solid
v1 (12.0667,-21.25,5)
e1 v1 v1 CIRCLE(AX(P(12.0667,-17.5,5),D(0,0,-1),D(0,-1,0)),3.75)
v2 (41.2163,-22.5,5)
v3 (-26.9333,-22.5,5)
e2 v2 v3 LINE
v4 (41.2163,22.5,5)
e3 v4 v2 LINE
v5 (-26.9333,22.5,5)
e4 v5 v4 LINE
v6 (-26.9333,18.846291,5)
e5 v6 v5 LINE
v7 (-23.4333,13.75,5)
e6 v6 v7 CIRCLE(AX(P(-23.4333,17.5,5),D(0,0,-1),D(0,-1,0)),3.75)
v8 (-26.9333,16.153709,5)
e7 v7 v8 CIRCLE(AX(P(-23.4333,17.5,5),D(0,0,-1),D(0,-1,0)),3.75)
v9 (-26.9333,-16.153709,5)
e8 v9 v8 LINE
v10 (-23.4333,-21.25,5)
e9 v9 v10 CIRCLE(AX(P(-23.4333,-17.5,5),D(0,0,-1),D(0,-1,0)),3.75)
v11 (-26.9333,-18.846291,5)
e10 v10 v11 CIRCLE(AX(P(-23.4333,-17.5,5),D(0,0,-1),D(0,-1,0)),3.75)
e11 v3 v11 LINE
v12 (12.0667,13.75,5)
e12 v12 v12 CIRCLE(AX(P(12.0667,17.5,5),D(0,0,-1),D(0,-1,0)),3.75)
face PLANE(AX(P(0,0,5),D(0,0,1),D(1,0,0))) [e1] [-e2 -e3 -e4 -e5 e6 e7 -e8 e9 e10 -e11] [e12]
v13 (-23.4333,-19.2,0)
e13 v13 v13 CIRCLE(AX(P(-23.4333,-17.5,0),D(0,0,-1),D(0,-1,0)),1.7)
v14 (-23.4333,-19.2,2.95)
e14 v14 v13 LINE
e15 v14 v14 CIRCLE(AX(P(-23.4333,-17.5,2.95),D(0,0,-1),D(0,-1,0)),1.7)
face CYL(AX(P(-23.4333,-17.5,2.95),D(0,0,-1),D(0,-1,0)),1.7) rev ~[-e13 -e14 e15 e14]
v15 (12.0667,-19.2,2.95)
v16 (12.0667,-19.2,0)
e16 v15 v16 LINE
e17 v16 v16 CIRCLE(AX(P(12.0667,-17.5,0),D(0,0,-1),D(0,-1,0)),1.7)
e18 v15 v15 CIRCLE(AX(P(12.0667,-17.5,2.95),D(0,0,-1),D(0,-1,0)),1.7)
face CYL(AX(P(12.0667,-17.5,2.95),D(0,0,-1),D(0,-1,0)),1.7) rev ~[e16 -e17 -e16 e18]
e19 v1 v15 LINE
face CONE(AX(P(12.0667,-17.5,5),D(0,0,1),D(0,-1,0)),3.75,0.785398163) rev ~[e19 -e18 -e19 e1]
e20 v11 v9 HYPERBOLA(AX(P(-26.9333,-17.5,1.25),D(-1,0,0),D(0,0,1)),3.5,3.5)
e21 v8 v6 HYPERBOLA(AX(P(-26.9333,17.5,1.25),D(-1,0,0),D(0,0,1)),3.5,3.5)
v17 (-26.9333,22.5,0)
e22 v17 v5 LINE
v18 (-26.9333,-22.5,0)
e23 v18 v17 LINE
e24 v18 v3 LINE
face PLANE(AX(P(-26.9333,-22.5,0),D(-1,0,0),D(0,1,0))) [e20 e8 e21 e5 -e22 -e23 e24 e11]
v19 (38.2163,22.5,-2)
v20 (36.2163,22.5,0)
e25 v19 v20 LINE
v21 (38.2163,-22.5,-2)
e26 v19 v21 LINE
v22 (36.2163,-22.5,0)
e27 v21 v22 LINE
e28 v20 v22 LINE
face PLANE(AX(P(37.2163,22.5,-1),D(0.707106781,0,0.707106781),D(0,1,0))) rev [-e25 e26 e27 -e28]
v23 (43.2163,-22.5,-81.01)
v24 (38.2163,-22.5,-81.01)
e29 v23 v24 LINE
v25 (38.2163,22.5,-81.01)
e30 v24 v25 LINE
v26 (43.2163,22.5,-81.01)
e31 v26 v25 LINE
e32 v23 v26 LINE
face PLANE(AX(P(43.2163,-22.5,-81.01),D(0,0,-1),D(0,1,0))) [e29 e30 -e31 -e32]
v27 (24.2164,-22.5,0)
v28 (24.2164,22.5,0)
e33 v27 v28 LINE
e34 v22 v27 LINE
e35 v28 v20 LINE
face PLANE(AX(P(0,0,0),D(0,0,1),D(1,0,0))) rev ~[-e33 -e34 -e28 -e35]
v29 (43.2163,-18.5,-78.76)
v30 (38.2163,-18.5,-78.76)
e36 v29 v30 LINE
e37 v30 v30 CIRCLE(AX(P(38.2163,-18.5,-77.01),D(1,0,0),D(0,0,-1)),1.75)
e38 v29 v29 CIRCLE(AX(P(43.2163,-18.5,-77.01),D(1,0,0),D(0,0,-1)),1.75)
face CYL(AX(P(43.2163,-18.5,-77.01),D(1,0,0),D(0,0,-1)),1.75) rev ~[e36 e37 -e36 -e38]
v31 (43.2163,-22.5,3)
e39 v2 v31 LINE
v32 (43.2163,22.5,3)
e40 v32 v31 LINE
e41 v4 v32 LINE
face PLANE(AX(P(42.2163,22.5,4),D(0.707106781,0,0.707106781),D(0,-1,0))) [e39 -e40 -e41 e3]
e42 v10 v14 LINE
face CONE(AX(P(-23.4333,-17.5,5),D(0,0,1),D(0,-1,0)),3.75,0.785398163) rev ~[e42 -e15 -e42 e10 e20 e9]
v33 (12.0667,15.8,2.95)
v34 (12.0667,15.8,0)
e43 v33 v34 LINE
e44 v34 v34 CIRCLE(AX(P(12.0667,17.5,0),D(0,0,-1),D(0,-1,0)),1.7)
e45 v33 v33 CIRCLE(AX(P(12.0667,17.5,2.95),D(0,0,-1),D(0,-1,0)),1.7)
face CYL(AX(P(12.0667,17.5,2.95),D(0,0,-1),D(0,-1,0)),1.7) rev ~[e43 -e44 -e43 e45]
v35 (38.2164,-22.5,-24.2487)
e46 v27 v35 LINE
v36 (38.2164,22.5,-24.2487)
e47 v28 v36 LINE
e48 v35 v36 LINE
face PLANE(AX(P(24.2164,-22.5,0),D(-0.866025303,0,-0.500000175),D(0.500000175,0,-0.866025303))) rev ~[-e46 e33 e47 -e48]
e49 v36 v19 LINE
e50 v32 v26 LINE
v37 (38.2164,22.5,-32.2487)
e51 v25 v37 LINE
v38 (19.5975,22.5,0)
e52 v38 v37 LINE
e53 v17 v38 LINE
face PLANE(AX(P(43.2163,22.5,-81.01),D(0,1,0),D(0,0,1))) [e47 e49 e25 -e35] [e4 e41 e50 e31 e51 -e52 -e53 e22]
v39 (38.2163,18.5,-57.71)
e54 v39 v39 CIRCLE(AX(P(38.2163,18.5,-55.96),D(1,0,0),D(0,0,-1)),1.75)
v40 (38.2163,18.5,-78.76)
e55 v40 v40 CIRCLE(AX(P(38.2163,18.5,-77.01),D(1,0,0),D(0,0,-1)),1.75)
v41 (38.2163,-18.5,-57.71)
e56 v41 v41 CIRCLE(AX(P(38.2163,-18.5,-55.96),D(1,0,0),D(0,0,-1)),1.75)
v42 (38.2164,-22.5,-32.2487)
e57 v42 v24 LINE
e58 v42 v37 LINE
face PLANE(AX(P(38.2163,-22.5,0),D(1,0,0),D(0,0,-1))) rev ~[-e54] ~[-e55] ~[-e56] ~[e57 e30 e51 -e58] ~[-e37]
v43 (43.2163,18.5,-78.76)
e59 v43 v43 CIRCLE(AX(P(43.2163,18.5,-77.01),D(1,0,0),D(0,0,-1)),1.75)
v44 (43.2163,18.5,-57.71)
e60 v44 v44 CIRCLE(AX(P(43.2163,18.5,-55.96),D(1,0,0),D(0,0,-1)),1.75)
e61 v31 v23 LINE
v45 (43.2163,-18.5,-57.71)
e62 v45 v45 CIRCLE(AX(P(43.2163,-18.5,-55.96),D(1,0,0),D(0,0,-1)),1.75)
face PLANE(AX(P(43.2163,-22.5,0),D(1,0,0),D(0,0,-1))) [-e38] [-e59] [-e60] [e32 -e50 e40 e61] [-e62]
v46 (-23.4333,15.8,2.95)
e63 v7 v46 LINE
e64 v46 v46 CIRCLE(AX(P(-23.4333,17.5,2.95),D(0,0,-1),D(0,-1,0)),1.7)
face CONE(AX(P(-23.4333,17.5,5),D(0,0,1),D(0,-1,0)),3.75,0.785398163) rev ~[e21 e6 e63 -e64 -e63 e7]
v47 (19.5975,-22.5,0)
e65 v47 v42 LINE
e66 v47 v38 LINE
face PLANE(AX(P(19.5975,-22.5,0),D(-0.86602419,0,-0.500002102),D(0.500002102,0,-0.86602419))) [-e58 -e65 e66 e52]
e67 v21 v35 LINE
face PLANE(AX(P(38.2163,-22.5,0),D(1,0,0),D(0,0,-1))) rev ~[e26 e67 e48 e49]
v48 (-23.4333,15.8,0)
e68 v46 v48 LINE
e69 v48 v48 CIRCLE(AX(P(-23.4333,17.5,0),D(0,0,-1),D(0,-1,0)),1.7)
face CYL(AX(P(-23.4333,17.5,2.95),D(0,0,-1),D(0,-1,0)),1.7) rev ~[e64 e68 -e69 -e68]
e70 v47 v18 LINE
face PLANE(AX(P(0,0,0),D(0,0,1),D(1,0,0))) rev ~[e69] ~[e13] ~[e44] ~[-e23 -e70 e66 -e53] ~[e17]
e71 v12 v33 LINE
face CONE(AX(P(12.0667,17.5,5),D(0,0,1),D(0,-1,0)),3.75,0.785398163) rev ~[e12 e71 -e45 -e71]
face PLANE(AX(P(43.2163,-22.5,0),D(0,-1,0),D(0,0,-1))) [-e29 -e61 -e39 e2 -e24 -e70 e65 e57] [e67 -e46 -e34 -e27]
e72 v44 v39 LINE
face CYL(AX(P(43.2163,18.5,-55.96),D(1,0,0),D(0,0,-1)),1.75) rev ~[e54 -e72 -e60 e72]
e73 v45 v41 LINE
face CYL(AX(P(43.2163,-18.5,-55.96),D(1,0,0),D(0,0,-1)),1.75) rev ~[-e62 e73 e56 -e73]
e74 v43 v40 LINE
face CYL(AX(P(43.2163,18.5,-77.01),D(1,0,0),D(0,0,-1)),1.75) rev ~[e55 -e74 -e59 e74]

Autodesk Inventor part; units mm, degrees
ref_plane "YZ Plane" through (0, 0, 0) normal (1, 0, 0) x (0, 1, 0)
ref_plane "XZ Plane" through (0, 0, 0) normal (0, 1, 0) x (-1, 0, 0)
ref_plane "XY Plane" through (0, 0, 0) normal (0, 0, 1) x (1, 0, 0)
sketch "Skizze1" plane through (0, 0, 0) normal (0, 0, 1) x (1, 0, 0)
  circle A0 centre (12.0667, -17.5) radius 2 projected
  circle A1 centre (12.0667, 17.5) radius 2 projected
  line L0 (17.0667, 22.5) -> (17.0667, -22.5) projected
  line L1 (7.0667, 22.5) -> (17.0667, 22.5) projected
  line L2 (7.0667, -22.5) -> (7.0667, 22.5) projected
  line L3 (17.0667, -22.5) -> (7.0667, -22.5) projected
  circle A2 centre (-23.4333, -17.5) radius 2 projected
  circle A3 centre (-23.4333, 17.5) radius 2 projected
  line L4 (-19.9333, 22.5) -> (-19.9333, -22.5) projected
  line L5 (-26.9333, 22.5) -> (-19.9333, 22.5) projected
  line L6 (-26.9333, -22.5) -> (-26.9333, 22.5) projected
  line L7 (-19.9333, -22.5) -> (-26.9333, -22.5) projected
  line L8 (43.2163, 19.557) -> (43.2163, 16.9277) projected
  line L9 (43.2163, -19.557) -> (43.2163, -16.9277) projected
  line L10 (43.2163, -20.3) -> (43.2163, -16.7) projected
  line L11 (43.2163, 20.3) -> (43.2163, 16.7) projected
  line L12 (-26.9333, 22.5) -> (43.2163, 22.5)
  line L13 (43.2163, 22.5) -> (43.2163, -22.5)
  line L14 (43.2163, -22.5) -> (-26.9333, -22.5)
  line L15 (-26.9333, -22.5) -> (-26.9333, 22.5)
  point P0 (0, 0)
extrude "Extrusion1" add sketch "Skizze1" along normal blind 5 contours A0 | A1 | L12 L13 L11 L8 L10 L9 L14 L0 | L0 L3 L2 L1 | L2 L14 L4 L12 | L4 L7 L6 L5 | A2 | A3
sketch "Skizze2" plane through (43.2163, -22.5, 0) normal (1, 0, 0) x (0, 0, -1)
  line L0 (0, 0) -> (-5, 0) projected
  line L1 (0, 0) -> (81.01, 0)
  line L2 (81.01, 0) -> (81.01, 45)
  line L3 (81.01, 45) -> (0, 45)
  line L4 (0, 45) -> (0, 0)
  circle A0 centre (77.01, 41) radius 1.8 construction
  circle A1 centre (77.01, 4) radius 1.8 construction
  arc A2 (54.796, 42.057) -> (57.124, 42.057) centre (55.96, 41) ccw construction
  arc A3 (57.124, 2.943) -> (54.796, 2.943) centre (55.96, 4) ccw construction
  circle A4 centre (55.96, 41) radius 1.75
  circle A5 centre (55.96, 4) radius 1.75
  circle A6 centre (77.01, 41) radius 1.75
  circle A7 centre (77.01, 4) radius 1.75
  point P0 (0, 22.5)
  dimension "d2" = 4
  dimension "d5" = 3.5
  dimension "d6" = 3.5
  dimension "d7" = 3.5
  dimension "d8" = 3.5
extrude "Extrusion2" add sketch "Skizze2" against normal blind 5
sketch "Skizze3" plane through (-26.9333, -22.5, 5) normal (0, -1, 0) x (1, 0, 0)
  line L0 (0, -5) -> (65.1497, -5) projected
  line L1 (31.7157, -5) -> (77.2703, -5) construction
  line L2 (65.1497, -86.01) -> (65.1497, -5) projected
  line L3 (51.1497, -5) -> (65.1497, -29.2487)
  line L4 (51.1497, -5) -> (79.1497, -5) construction
  line L5 (46.5308, -5) -> (65.1497, -37.2487)
  point P0 (26.9333, -5)
  dimension "d11" = 60
  dimension "d12" = 14
  dimension "d13" = 4
extrude "Extrusion3" add sketch "Skizze3" against normal up to surface (45 mm away) contours L0 L3 L2 L5
chamfer "Fasen1" distance 2 angle 45 2 edges at (38.2163, 0, 0) (43.2163, 0, 5)
sketch "Skizze4" plane through (0, 0, 5) normal (0, 0, 1) x (1, 0, 0)
  circle A0 centre (12.0667, 17.5) radius 2 projected
  circle A1 centre (12.0667, -17.5) radius 2 projected
  circle A2 centre (-23.4333, -17.5) radius 2 projected
  circle A3 centre (-23.4333, 17.5) radius 2 projected
  point P0 (0, 0)
hole "Bohrung1" at (12.0667, 17.5, 5) at (12.0667, -17.5, 5) at (-23.4333, -17.5, 5) at (-23.4333, 17.5, 5) direction (0, 0, -1) diameter 3.4 depth 8 countersink diameter 7.5 countersink angle 90 clearance for "Innensechskant-Senkkopfschraube DIN EN ISO 10642" size "M3" standard "DIN"
properties part number "Kameraturm_Cognex_Halter"
